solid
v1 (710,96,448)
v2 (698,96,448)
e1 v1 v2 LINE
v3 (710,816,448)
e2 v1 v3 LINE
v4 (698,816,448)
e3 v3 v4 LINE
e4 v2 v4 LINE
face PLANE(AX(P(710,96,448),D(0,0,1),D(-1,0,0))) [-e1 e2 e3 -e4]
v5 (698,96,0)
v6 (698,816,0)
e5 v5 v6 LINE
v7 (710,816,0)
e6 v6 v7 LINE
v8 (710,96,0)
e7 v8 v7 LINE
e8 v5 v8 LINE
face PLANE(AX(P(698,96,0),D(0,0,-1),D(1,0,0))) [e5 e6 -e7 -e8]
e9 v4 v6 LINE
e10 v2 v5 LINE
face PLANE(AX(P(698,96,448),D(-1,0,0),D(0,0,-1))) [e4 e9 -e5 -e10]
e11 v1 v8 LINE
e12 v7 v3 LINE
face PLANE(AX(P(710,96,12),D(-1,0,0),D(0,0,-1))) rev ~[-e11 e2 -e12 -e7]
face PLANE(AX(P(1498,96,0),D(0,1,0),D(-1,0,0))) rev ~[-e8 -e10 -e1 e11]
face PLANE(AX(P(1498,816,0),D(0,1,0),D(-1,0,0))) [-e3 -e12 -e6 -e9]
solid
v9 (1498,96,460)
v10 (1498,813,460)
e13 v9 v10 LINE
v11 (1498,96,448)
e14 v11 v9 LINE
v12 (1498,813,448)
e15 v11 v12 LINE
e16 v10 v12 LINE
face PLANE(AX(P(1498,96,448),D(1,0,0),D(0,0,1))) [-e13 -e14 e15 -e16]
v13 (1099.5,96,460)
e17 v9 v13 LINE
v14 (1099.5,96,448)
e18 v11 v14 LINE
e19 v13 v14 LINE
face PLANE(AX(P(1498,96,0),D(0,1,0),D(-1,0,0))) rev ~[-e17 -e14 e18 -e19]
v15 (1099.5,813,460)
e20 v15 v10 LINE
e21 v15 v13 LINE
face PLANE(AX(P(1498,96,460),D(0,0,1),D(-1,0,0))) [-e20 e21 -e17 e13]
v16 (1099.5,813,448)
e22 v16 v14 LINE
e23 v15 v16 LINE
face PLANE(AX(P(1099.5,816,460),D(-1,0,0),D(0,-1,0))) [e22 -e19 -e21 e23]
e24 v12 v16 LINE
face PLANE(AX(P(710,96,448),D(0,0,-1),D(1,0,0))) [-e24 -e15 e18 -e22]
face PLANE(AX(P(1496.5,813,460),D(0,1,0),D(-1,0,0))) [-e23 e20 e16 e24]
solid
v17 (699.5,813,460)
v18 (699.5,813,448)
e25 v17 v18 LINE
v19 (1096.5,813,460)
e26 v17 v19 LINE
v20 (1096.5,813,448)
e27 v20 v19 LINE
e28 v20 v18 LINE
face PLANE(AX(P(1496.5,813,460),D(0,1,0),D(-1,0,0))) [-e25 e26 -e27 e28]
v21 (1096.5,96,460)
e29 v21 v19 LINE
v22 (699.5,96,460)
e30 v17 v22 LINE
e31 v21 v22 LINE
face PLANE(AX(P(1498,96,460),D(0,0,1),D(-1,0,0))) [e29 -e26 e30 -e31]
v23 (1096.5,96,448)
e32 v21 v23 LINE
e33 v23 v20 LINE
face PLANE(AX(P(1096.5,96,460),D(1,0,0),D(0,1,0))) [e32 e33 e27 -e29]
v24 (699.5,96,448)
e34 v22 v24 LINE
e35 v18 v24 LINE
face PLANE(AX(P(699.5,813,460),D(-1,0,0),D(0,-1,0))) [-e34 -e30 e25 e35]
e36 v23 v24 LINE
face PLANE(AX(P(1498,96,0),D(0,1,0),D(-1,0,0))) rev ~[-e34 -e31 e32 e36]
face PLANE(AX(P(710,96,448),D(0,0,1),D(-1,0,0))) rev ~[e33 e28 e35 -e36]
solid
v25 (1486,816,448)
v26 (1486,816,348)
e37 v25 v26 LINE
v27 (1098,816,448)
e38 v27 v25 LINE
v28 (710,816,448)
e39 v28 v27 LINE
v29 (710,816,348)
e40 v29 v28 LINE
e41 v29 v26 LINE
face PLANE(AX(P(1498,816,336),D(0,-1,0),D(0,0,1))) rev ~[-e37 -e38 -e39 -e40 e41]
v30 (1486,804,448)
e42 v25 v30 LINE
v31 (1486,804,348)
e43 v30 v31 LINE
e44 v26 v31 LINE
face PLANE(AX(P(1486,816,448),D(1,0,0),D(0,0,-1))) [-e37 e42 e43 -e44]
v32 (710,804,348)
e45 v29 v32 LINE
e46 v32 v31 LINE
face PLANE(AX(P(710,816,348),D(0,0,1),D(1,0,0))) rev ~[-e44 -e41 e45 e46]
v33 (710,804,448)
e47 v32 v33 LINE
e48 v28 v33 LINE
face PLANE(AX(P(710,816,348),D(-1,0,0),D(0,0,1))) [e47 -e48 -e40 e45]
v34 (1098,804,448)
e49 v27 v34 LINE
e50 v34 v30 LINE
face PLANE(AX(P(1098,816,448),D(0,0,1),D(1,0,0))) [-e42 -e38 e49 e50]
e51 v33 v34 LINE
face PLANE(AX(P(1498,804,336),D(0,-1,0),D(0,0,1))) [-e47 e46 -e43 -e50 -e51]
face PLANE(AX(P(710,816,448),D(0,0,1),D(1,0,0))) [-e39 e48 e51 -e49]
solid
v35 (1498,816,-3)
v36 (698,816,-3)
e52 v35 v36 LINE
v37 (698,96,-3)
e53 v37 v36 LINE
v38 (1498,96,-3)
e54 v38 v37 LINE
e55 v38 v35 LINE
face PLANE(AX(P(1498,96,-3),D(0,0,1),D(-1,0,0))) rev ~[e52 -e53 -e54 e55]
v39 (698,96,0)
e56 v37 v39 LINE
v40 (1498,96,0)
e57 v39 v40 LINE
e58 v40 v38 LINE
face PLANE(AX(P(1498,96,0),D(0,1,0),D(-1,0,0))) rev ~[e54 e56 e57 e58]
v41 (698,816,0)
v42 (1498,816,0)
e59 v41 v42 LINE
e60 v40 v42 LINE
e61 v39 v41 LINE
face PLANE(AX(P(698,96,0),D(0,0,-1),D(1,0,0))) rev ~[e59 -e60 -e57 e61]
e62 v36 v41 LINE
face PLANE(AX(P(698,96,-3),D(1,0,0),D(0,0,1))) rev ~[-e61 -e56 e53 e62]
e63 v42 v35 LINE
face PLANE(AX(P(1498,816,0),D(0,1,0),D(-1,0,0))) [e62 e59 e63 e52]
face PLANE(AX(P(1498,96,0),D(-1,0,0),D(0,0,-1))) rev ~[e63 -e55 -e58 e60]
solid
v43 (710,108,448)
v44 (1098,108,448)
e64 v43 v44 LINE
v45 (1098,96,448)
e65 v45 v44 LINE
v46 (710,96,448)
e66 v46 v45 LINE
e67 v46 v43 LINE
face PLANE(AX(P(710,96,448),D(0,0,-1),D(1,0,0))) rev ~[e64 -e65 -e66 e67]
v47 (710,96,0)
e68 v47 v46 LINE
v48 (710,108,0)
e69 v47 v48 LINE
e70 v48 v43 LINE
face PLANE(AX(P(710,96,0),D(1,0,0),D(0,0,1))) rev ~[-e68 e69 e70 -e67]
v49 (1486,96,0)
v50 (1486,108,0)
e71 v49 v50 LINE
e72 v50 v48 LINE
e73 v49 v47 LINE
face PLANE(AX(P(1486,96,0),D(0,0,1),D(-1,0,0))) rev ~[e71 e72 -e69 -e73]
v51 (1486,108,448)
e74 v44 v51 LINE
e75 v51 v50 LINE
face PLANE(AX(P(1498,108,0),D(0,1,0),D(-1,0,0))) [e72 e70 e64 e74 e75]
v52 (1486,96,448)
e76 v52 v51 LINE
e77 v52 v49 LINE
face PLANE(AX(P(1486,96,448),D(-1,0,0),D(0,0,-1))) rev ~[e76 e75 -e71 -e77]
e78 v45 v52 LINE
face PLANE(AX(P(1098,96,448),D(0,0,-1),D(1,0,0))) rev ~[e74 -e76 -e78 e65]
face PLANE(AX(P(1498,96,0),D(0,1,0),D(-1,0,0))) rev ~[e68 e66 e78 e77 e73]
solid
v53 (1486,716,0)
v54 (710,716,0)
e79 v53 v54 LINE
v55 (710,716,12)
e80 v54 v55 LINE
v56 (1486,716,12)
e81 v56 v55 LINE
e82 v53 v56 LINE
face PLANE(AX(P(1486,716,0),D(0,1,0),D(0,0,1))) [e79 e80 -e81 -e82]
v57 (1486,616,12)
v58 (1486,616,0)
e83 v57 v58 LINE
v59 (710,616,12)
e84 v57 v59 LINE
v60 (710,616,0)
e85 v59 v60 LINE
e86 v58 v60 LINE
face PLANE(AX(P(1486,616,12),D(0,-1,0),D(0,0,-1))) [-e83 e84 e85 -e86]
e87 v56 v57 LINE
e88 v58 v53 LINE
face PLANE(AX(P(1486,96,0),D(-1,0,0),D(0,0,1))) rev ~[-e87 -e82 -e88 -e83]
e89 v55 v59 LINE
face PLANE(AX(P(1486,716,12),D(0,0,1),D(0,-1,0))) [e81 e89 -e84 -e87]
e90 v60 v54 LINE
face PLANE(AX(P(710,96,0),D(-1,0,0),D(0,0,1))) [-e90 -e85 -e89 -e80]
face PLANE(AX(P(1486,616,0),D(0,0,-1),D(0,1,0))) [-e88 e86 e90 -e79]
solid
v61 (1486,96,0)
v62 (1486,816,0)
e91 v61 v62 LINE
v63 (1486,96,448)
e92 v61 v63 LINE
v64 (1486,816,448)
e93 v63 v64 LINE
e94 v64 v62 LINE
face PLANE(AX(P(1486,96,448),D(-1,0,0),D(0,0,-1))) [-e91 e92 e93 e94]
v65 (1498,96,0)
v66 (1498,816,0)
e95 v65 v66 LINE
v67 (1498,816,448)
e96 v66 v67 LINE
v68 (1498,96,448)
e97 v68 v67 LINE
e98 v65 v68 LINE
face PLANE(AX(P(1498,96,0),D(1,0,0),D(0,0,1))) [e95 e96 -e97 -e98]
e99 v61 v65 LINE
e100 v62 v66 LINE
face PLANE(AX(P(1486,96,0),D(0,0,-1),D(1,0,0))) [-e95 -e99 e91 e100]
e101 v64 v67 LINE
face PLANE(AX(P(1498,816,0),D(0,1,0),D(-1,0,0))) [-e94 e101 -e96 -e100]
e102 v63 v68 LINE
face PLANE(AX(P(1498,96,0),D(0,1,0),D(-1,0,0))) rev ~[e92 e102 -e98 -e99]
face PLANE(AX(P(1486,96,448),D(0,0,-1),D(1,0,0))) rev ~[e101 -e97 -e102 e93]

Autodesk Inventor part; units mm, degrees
ref_plane "YZ Plane" through (0, 0, 0) normal (1, 0, 0) x (0, 1, 0)
sketch "Sketch1" plane through (0, 0, 0) normal (0, 0, 1) x (1, 0, 0)
  line L0 (-1498, 0) -> (1498, 0) construction
  line L1 (-1498, 0) -> (-898, 0)
  line L2 (-898, 0) -> (-898, 2068)
  line L3 (-898, 2068) -> (-1498, 2068)
  line L4 (-1498, 2068) -> (-1498, 0)
  line L5 (-898, 0) -> (-498, 0)
  line L6 (-498, 0) -> (-498, 816)
  line L7 (-498, 816) -> (-898, 816)
  line L8 (-898, 816) -> (-898, 0)
  line L9 (-498, 0) -> (102, 0)
  line L10 (102, 0) -> (102, 816)
  line L11 (102, 816) -> (-498, 816)
  line L12 (-498, 816) -> (-498, 0)
  line L13 (102, 0) -> (698, 0)
  line L14 (698, 0) -> (698, 668)
  line L15 (698, 668) -> (102, 668)
  line L16 (102, 668) -> (102, 0)
  line L17 (698, 0) -> (1498, 0)
  line L18 (1498, 0) -> (1498, 816)
  line L19 (1498, 816) -> (698, 816)
  line L20 (698, 816) -> (698, 0)
  line L21 (-1498, 0) -> (1498, 0)
  line L22 (1498, 0) -> (1498, 96)
  line L23 (1498, 96) -> (-1498, 96)
  line L24 (-1498, 96) -> (-1498, 0)
  line L25 (-898, 816) -> (1498, 816)
  line L26 (1498, 816) -> (1498, 832)
  line L27 (1498, 832) -> (-898, 832)
  line L28 (-898, 832) -> (-898, 816)
  line L29 (-898, 1972) -> (-498, 1972)
  line L30 (-498, 1972) -> (-498, 1372)
  line L31 (-498, 1372) -> (-898, 1372)
  line L32 (-898, 1372) -> (-898, 1972)
  line L33 (698, 1972) -> (1498, 1972)
  line L34 (1498, 1972) -> (1498, 1372)
  line L35 (1498, 1372) -> (698, 1372)
  line L36 (698, 1372) -> (698, 1972)
  line L37 (698, 1372) -> (98, 1372)
  line L38 (98, 1372) -> (98, 1972)
  line L39 (98, 1972) -> (698, 1972)
  line L40 (698, 1972) -> (698, 1372)
  line L41 (-498, 1372) -> (98, 1372)
  line L42 (-498, 1372) -> (-275, 1637.7611)
  line L43 (98, 1372) -> (-125, 1637.7611)
  line L44 (-275, 1637.7611) -> (-125, 1637.7611)
  line L45 (-125, 1637.7611) -> (-125, 2068)
  line L46 (-125, 2068) -> (-275, 2068)
  line L47 (-275, 2068) -> (-275, 1637.7611)
  line L48 (1098, 816) -> (1098, 96)
  line L49 (-198, 816) -> (-198, 96)
  line L50 (-898, 668) -> (-498, 668)
  line L51 (-1498, 520) -> (-898, 520)
  line L52 (-1498, 1579) -> (-898, 1579)
  line L53 (398, 1972) -> (398, 1372)
  line L54 (1098, 1972) -> (1098, 1372)
  line L55 (698, 1876) -> (1498, 1876)
  line L56 (698, 1468) -> (1498, 1468)
  line L57 (-1498, 1049.5) -> (-898, 1049.5)
  point P0 (0, 0)
  point P1 (0, 0)
  point P2 (0, 0)
  point P3 (1098, 816)
  point P4 (-198, 816)
  point P5 (0, 0)
  dimension "d0" = 2996
  dimension "d1" = 600
  dimension "d2" = 2068
  dimension "d3" = 400
  dimension "d4" = 816
  dimension "d5" = 600
  dimension "d6" = 816
  dimension "d7" = 596
  dimension "d8" = 668
  dimension "d9" = 800
  dimension "d10" = 816
  dimension "d11" = 96
  dimension "d12" = 16
  dimension "d13" = 400
  dimension "d14" = 600
  dimension "d15" = 96
  dimension "d16" = 800
  dimension "d17" = 600
  dimension "d18" = 600
  dimension "d19" = 600
  dimension "d20" = 50
  dimension "d21" = 150
  dimension "d22" = 148
  dimension "d23" = 1059
  dimension "d24" = 96
  dimension "d25" = 96
  dimension "d26" = 529.5
ref_plane "Work Plane1" through (1498, 96, 0) normal (0, 1, 0) x (-1, 0, 0)
sketch "Sketch2" plane through (1498, 96, 0) normal (0, 1, 0) x (-1, 0, 0)
  line L0 (800, 0) -> (0, 0)
  line L1 (0, 0) -> (0, 460)
  line L2 (0, 460) -> (800, 460)
  line L3 (800, 460) -> (800, 0)
  line L4 (788, 448) -> (12, 448)
  line L5 (12, 448) -> (12, 12)
  line L6 (12, 12) -> (788, 12)
  line L7 (788, 12) -> (788, 448)
  line L8 (788, 12) -> (788, 0)
  line L9 (12, 12) -> (12, 0)
  line L10 (12, 448) -> (0, 448)
  line L11 (788, 448) -> (800, 448)
  point P0 (1498, 0)
  point P1 (800, 0)
  point P2 (0, 0)
  dimension "d28" = 460
  dimension "d29" = 12
extrude "Extrusion1" add sketch "Sketch2" along normal up to surface (720 mm away) contours L0 L8 L7 L11 L3 | L0 L1 L10 L5 L9
extrude "Extrusion2" add sketch "Sketch2" along normal up to surface (720 mm away) separate body contours L11 L4 L10 L1 L2 L3
split body "Split1" sketch "Sketch1" result two bodies bodies 2 curves L48 first body at (1231.3333, 576, 459.5)
sketch "Sketch3" plane through (1498, 96, 0) normal (0, 1, 0) x (-1, 0, 0)
  line L0 (800, 448) -> (800, 0) projected
  line L1 (800, 0) -> (0, 0)
  line L2 (0, 0) -> (0, -3)
  line L3 (0, -3) -> (800, -3)
  line L4 (800, -3) -> (800, 0)
  point P0 (1498, 0)
  dimension "d34" = 3
extrude "Extrusion3" add sketch "Sketch3" along normal up to surface (720 mm away) separate body
sketch "Sketch5" plane through (1498, 96, 0) normal (0, 1, 0) x (-1, 0, 0)
  line L0 (788, 0) -> (788, 448) projected
  line L1 (800, 448) -> (400, 448) projected
  line L2 (400, 448) -> (0, 448) projected
  line L3 (12, 448) -> (12, 0) projected
  line L4 (0, 0) -> (800, 0) projected
  point P0 (1498, 0)
extrude "Extrusion5" add sketch "Sketch5" along normal blind 12 separate body
sketch "Sketch4" plane through (1486, 96, 0) normal (-1, 0, 0) x (0, 0, 1)
  line L0 (0, 0) -> (0, 720) projected
  line L1 (0, 620) -> (12, 620)
  line L2 (12, 620) -> (12, 520)
  line L3 (12, 520) -> (0, 520)
  line L4 (0, 520) -> (0, 620)
  point P0 (0, -96)
  point P1 (0, 620)
  point P2 (0, 520)
  dimension "d37" = 12
  dimension "d38" = 100
  dimension "d39" = 100
extrude "Extrusion4" add sketch "Sketch4" along normal up to surface (776 mm away) separate body
ref_plane "Work Plane2" through (1498, 816, 336) normal (0, -1, 0) x (0, 0, 1)
sketch "Sketch6" plane through (1498, 816, 336) normal (0, -1, 0) x (0, 0, 1)
  line L0 (-336, 788) -> (112, 788) projected
  line L1 (112, 800) -> (112, 400) projected
  line L2 (112, 400) -> (112, 0) projected
  line L3 (112, 12) -> (-336, 12) projected
  line L4 (12, 788) -> (12, 12)
  point P0 (-336, 1498)
  dimension "d44" = 100
extrude "Extrusion6" add sketch "Sketch6" along normal blind 12 separate body
sketch "Sketch7" plane through (1498, 96, 460) normal (0, 0, 1) x (1, 0, 0)
  line L0 (-800, 720) -> (-400, 720) projected
  line L1 (0, 0) -> (-400, 0) projected
  line L2 (-401.5, 720) -> (-398.5, 720)
  line L3 (-398.5, 720) -> (-398.5, 0)
  line L4 (-398.5, 0) -> (-401.5, 0)
  line L5 (-401.5, 0) -> (-401.5, 720)
  line L6 (-400, 0) -> (-400, 720) projected
  point P0 (-1498, -96)
  dimension "d47" = 1.5
  dimension "d48" = 1.5
extrude "Extrusion7" cut sketch "Sketch7" against normal blind 12 bodies 3 4
sketch "Sketch8" plane through (698, 96, 460) normal (0, 0, 1) x (1, 0, 0)
  line L0 (0, 0) -> (0, 720) projected
  line L1 (800, 0) -> (800, 720) projected
  line L2 (0, 720) -> (800, 720)
  line L3 (800, 720) -> (800, 717)
  line L4 (800, 717) -> (0, 717)
  line L5 (0, 717) -> (0, 720)
  line L6 (0, 0) -> (398.5, 0) projected
  line L7 (0, 717) -> (1.5, 717)
  line L8 (1.5, 717) -> (1.5, 0)
  line L9 (1.5, 0) -> (0, 0)
  line L10 (0, 0) -> (0, 717)
  line L11 (800, 717) -> (798.5, 717)
  line L12 (798.5, 717) -> (798.5, 0)
  line L13 (798.5, 0) -> (800, 0)
  line L14 (800, 0) -> (800, 717)
  point P0 (-698, -96)
  point P1 (1.5, 717)
  dimension "d51" = 3
  dimension "d52" = 1.5
  dimension "d53" = 1.5
extrude "Extrusion8" cut sketch "Sketch8" against normal blind 12 contours L0 L4 L8 L6 | L0 L2 L1 L4 bodies 4 3
properties part number "Base Cabinet 4"
